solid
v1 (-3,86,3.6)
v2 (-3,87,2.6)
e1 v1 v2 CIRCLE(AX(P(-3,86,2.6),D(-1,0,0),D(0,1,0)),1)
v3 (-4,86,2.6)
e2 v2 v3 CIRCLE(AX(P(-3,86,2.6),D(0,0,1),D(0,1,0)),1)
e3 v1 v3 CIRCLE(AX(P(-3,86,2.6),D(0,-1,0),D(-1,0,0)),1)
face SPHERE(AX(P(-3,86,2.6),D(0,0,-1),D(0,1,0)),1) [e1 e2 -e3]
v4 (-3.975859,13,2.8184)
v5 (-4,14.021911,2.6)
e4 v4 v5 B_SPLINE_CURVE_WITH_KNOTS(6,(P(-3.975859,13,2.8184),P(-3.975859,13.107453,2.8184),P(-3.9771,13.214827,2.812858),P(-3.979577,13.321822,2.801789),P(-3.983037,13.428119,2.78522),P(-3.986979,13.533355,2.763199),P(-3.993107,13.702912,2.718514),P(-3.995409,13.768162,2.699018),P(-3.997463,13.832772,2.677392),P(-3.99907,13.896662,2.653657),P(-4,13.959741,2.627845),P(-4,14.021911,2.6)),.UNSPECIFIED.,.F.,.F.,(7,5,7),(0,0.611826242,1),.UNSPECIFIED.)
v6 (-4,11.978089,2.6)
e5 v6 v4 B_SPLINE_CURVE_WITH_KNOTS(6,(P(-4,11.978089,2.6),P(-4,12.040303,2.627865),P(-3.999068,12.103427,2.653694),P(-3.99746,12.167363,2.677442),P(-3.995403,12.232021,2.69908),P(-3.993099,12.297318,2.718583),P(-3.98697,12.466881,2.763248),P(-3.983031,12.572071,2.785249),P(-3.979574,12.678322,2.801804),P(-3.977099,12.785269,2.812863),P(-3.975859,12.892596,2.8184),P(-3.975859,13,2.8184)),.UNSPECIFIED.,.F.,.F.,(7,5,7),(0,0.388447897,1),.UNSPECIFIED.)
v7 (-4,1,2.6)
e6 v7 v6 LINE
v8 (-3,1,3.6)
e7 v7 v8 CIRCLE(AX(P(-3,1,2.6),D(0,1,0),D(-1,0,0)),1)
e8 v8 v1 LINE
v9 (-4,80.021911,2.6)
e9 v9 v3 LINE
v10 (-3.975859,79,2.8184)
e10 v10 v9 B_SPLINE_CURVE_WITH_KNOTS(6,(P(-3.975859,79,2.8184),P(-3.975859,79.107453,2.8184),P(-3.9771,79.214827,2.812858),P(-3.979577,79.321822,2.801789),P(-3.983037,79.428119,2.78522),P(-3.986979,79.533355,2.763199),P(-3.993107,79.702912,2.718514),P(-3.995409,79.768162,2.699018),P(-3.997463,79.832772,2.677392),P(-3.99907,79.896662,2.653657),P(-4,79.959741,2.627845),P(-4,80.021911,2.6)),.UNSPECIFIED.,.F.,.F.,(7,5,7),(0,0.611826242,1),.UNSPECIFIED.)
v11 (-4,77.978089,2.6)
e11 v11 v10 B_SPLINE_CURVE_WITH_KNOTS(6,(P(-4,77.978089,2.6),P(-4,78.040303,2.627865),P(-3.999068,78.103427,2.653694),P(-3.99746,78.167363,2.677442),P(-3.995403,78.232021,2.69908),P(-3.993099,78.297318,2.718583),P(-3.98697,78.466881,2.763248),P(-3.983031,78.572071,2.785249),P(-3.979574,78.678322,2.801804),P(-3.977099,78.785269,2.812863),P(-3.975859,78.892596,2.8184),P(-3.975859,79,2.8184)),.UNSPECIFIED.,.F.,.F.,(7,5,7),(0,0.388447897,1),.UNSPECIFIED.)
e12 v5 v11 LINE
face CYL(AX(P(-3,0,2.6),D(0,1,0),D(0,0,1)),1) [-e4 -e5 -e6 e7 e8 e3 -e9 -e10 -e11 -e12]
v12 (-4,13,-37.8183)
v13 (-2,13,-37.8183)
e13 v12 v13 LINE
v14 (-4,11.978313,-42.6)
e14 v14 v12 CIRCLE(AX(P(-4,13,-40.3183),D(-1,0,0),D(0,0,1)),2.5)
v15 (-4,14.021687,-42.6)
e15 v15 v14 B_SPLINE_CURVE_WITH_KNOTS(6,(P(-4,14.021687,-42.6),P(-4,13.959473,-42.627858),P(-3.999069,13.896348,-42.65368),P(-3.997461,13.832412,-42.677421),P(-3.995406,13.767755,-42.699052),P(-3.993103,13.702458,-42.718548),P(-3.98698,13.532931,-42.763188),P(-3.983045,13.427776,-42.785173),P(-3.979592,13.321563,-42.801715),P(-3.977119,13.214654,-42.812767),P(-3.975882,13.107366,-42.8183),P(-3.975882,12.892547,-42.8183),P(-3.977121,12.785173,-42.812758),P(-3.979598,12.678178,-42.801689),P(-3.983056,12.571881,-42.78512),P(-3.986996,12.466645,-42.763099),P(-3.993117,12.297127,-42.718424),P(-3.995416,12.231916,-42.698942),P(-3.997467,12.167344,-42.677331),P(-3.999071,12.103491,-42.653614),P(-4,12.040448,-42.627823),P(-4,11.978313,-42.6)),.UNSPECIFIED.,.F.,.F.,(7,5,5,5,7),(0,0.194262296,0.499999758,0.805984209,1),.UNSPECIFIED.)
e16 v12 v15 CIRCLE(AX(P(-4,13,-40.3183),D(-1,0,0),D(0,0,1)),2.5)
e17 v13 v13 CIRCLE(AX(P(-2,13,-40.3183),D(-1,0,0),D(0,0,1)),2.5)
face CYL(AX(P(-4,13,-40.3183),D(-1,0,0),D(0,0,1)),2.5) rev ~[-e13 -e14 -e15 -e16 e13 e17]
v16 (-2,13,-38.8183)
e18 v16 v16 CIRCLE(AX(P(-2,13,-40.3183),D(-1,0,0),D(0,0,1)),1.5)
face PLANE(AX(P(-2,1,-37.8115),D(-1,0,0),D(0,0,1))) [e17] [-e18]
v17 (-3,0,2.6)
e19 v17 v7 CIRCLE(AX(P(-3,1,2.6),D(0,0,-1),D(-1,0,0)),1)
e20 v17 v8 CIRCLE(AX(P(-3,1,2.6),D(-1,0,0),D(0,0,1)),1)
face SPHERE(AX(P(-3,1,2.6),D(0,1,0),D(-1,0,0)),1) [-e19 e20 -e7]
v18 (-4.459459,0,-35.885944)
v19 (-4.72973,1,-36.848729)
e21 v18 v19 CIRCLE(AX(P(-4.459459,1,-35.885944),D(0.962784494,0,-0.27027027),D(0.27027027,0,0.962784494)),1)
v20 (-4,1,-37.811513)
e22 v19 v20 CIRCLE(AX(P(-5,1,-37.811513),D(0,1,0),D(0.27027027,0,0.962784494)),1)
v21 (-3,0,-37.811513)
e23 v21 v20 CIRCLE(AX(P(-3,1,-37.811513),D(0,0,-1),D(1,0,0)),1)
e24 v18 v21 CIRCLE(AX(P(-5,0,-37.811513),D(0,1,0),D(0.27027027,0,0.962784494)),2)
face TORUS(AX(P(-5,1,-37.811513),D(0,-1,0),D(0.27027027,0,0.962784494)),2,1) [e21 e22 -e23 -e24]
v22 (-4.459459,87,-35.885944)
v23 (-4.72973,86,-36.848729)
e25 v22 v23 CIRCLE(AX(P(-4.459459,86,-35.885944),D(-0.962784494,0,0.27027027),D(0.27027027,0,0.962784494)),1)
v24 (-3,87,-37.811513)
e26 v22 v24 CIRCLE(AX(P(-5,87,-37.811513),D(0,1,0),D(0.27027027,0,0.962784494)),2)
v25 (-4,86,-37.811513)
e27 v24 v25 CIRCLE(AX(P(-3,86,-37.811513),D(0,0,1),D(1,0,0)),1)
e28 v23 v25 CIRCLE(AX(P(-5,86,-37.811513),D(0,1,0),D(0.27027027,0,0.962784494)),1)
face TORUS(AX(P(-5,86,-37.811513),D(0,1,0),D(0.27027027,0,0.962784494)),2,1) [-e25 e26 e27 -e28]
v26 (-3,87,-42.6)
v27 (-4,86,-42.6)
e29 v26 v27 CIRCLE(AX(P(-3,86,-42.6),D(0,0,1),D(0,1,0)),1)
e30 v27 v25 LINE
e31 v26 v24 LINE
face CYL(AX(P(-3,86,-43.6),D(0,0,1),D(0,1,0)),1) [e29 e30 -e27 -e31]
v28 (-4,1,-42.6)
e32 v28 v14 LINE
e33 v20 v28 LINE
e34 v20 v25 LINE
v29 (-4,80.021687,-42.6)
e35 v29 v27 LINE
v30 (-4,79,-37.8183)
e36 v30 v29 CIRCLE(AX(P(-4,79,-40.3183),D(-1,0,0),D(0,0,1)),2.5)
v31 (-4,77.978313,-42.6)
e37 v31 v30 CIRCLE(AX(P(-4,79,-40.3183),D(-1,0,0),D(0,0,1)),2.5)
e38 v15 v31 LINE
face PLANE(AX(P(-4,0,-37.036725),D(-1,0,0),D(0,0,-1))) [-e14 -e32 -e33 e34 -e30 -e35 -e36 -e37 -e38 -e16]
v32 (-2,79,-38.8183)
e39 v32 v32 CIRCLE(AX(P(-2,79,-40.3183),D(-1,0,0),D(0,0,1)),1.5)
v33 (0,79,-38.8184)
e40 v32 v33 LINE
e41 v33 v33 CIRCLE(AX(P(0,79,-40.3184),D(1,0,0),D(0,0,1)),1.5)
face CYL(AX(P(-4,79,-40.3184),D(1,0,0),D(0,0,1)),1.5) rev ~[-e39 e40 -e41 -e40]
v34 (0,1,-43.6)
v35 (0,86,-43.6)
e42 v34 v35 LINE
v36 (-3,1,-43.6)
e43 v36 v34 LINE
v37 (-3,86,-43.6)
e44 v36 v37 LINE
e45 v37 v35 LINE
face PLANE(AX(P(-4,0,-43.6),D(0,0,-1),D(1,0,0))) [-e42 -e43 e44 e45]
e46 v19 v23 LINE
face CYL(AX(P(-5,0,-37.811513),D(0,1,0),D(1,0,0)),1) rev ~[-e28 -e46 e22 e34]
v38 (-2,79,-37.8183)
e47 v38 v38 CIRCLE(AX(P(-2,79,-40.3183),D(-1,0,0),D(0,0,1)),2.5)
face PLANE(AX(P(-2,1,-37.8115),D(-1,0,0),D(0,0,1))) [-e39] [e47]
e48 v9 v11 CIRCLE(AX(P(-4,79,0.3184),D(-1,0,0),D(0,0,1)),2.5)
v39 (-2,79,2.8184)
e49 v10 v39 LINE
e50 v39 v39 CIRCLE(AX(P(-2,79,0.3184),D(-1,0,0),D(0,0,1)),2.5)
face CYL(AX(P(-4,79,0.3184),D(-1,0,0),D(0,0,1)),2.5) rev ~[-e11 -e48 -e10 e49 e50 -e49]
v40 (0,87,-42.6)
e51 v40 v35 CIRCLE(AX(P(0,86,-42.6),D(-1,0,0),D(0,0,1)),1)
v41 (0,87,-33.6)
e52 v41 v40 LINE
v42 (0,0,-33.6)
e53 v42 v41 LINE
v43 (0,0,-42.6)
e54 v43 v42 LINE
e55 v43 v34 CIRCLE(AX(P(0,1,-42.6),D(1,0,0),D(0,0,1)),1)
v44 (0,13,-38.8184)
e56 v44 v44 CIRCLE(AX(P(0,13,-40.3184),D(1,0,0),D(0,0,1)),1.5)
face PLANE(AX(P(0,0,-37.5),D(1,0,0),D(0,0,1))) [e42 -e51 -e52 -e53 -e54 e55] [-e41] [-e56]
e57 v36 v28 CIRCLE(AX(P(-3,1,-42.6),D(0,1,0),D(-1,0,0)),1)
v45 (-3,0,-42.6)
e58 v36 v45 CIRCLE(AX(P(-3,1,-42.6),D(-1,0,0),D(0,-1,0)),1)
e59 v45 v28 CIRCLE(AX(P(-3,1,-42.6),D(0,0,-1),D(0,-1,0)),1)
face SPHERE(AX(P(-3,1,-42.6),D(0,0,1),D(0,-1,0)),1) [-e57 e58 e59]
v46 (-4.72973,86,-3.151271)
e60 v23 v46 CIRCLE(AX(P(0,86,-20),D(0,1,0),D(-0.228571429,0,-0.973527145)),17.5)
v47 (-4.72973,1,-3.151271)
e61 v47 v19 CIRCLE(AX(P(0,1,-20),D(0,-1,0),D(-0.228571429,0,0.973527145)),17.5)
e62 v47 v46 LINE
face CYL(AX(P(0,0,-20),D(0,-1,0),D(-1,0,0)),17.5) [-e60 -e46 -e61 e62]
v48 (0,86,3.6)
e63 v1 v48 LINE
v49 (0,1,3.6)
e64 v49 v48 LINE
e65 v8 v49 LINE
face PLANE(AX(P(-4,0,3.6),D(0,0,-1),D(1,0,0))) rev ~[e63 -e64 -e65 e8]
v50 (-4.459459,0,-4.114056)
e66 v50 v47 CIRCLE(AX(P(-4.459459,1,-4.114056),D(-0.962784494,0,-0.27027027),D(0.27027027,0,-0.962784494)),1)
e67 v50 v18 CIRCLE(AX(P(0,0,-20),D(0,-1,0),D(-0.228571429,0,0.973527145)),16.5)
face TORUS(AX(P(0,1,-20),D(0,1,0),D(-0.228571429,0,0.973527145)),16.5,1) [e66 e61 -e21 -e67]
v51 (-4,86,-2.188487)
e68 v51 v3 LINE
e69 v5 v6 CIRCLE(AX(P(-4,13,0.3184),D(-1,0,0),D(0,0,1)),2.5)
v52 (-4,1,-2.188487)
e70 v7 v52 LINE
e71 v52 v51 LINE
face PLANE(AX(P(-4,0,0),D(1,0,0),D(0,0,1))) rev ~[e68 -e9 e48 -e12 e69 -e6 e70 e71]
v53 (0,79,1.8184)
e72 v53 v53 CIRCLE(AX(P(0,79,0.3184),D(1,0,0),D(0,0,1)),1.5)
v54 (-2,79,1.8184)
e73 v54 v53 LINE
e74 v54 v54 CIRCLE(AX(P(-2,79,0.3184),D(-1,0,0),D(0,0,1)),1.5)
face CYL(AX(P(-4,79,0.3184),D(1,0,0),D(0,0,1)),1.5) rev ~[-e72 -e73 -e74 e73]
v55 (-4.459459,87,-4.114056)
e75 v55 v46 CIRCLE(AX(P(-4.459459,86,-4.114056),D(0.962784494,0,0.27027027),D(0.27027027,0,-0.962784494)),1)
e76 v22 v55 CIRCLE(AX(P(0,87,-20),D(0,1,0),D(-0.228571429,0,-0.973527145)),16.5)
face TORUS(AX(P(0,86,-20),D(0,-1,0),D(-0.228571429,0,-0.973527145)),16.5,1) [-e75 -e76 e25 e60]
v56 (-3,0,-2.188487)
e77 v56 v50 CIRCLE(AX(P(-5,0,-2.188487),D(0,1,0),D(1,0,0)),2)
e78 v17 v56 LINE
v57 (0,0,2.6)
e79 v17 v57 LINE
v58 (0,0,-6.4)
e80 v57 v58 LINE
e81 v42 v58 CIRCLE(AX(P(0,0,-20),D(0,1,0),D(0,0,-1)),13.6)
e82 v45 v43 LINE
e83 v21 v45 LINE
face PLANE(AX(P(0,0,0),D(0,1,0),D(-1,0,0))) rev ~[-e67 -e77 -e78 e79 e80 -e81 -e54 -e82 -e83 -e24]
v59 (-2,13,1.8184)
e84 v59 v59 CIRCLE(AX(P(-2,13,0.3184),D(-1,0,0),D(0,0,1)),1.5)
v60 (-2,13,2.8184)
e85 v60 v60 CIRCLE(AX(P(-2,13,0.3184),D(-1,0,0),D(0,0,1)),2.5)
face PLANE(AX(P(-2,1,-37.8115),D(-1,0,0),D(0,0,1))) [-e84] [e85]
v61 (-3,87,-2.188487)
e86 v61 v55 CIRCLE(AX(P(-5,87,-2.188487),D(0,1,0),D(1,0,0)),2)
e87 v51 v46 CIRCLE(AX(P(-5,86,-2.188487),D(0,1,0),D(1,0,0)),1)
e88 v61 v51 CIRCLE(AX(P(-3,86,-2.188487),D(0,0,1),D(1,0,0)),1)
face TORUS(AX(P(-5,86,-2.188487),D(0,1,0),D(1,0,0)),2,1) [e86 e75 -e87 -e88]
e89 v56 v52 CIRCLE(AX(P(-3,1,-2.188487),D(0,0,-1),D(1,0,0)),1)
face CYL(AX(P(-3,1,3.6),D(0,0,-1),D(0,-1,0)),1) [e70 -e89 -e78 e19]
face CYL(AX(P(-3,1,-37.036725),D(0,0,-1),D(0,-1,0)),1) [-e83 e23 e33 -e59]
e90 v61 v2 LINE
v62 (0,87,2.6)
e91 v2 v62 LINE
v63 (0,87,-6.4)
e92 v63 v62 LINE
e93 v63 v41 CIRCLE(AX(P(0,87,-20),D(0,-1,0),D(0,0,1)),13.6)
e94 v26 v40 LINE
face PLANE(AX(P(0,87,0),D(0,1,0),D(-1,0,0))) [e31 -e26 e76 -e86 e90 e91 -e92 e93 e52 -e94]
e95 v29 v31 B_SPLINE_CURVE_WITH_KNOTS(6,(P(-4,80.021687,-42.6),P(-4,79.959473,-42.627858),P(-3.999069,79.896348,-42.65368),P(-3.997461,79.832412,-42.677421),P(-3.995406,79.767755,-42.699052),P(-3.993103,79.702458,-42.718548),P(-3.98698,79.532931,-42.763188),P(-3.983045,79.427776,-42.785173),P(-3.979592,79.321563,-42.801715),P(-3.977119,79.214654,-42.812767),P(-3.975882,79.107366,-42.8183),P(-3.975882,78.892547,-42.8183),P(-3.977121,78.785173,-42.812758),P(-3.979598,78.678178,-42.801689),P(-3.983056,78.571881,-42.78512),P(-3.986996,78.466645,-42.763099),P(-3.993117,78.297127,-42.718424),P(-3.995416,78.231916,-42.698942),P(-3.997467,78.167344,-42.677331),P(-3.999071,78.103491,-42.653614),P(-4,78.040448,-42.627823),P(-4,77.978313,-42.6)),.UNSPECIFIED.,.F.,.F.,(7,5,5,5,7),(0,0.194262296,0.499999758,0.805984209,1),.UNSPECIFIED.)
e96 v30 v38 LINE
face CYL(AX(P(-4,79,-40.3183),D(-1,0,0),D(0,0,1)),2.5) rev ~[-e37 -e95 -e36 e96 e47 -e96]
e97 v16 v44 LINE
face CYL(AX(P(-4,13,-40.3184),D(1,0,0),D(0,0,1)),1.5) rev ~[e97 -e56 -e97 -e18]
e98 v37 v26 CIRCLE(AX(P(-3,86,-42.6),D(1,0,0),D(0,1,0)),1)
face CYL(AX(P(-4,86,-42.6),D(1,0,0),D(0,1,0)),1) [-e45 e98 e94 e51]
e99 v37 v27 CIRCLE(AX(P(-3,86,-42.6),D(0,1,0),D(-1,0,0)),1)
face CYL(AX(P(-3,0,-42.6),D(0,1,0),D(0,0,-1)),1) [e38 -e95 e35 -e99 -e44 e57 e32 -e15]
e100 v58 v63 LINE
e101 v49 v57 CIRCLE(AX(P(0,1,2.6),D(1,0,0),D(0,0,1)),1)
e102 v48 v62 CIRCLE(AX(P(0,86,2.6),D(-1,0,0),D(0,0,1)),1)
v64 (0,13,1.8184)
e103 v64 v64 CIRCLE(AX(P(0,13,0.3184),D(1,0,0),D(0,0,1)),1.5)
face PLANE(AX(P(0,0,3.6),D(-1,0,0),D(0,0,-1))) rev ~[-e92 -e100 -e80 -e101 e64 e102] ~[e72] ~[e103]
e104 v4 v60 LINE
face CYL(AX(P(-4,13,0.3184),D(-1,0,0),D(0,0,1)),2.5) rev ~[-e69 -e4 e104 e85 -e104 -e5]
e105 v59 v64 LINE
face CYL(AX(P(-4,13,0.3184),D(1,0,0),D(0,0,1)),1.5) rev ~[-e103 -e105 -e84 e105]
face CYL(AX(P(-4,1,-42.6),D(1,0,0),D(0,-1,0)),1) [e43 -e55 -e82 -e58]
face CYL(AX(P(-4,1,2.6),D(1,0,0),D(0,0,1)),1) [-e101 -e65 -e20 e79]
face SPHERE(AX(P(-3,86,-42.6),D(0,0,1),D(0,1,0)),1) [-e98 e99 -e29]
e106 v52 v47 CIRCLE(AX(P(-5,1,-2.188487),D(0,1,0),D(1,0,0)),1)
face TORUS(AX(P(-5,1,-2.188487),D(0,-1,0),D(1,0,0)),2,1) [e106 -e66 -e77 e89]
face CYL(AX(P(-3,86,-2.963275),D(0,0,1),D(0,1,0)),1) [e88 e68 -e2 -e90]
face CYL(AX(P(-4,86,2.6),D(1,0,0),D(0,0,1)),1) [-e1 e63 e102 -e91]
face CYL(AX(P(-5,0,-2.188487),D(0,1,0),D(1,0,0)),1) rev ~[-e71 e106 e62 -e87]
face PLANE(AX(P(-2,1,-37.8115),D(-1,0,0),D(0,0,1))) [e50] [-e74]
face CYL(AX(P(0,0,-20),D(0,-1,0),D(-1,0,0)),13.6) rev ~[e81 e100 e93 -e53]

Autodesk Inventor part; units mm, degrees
ref_plane "YZ Plane" through (0, 0, 0) normal (1, 0, 0) x (0, 1, 0)
ref_plane "XZ Plane" through (0, 0, 0) normal (0, 1, 0) x (-1, 0, 0)
ref_plane "XY Plane" through (0, 0, 0) normal (0, 0, 1) x (1, 0, 0)
sketch "スケッチ1" plane through (0, 0, 0) normal (0, 1, 0) x (-1, 0, 0)
  line L0 (0, 0) -> (20, 0)
  line L1 (20, 0) -> (20, -40)
  line L2 (20, -40) -> (0, -40)
  line L3 (0, -40) -> (0, 0)
  circle A0 centre (0, -20) radius 13.6
  circle A1 centre (0, -20) radius 17.5
  line L4 (0, -6.4) -> (4, -6.4)
  line L5 (4, -6.4) -> (4, 3.6)
  line L6 (4, 3.6) -> (0, 3.6)
  line L7 (0, 3.6) -> (0, -6.4)
  line L8 (0, -33.6) -> (4, -33.6)
  line L9 (4, -33.6) -> (4, -43.6)
  line L10 (4, -43.6) -> (0, -43.6)
  line L11 (0, -43.6) -> (0, -33.6)
  point P0 (0, -6.4)
  point P1 (0, -33.6)
  point P2 (4, -37.0367)
  point P3 (4, -2.9633)
  dimension "d0" = 20
  dimension "d1" = 40
  dimension "d2" = 27.2
  dimension "d3" = 35
  dimension "d4" = 4
  dimension "d5" = 10
  dimension "d6" = 4
  dimension "d7" = 10
extrude "押し出し1" add sketch "スケッチ1" along normal blind 87 contours L7 L6 L5 L0 | L0 L5 A1 L3 | A1 L5 L4 L3 | A1 L9 L8 A0 L4 L5 | A1 L9 L2 L3 | L3 L8 L9 A1 | L2 L9 L10 L11
sketch "スケッチ2" plane through (-4, 0, -43.6) normal (-1, 0, 0) x (0, 0, 1)
  line L0 (0, 87) -> (6.5633, 87) projected
  line L1 (40.6367, 87) -> (47.2, 87) projected
  line L2 (40.6367, 0) -> (47.2, 0) projected
  line L3 (0, 0) -> (6.5633, 0) projected
  point P0 (43.6, 0)
  point P1 (3.2816, 13)
  point P2 (3.2816, 79)
  point P3 (43.9184, 79)
  point P4 (43.9184, 13)
  point P5 (3.2816, 87)
  point P6 (43.9184, 87)
  point P7 (43.9184, 0)
  point P8 (3.2816, 0)
  dimension "d10" = 0
  dimension "d11" = 8
  dimension "d12" = 0
  dimension "d13" = 8
  dimension "d14" = 0
  dimension "d15" = 0
  dimension "d16" = 13
  dimension "d17" = 13
hole "穴1" at (-4, 13, -40.3184) at (-4, 79, -40.3184) at (-4, 79, 0.3184) at (-4, 13, 0.3184) direction (1, 0, 0) diameter 3 end through all
fillet "フィレット1" radius 1 14 edges at (-4, 87, 0.3184) (-17.5, 87, -20) (-4, 87, -40.3184) (-2, 87, -43.6) (-2, 87, 3.6) (-4, 43.5, 3.6) (-4, 0, 0.3184) (-17.5, 0, -20) (-4, 0, -40.3184) (-2, 0, -43.6) (-2, 0, 3.6) (-4, 43.5, -43.6) (-4, 43.5, -37.0367) (-4, 43.5, -2.9633)
sketch "スケッチ5" plane through (-4, 1, -37.8115) normal (-1, 0, 0) x (0, 0, 1)
  circle A0 centre (-2.5068, 12) radius 1.5 projected
  circle A1 centre (-2.5068, 12) radius 2.5
  circle A2 centre (38.1299, 12) radius 1.5 projected
  circle A3 centre (38.1299, 12) radius 2.5
  circle A4 centre (-2.5068, 78) radius 1.5 projected
  circle A5 centre (-2.5068, 78) radius 2.5
  circle A6 centre (38.1299, 78) radius 1.5 projected
  circle A7 centre (38.1299, 78) radius 2.5
  point P0 (37.8115, -1)
  dimension "d36" = 5
  dimension "d37" = 5
  dimension "d38" = 5
  dimension "d39" = 5
extrude "押し出し4" cut sketch "スケッチ5" against normal blind 2
properties part number "arm-2-2_3D プリント"
